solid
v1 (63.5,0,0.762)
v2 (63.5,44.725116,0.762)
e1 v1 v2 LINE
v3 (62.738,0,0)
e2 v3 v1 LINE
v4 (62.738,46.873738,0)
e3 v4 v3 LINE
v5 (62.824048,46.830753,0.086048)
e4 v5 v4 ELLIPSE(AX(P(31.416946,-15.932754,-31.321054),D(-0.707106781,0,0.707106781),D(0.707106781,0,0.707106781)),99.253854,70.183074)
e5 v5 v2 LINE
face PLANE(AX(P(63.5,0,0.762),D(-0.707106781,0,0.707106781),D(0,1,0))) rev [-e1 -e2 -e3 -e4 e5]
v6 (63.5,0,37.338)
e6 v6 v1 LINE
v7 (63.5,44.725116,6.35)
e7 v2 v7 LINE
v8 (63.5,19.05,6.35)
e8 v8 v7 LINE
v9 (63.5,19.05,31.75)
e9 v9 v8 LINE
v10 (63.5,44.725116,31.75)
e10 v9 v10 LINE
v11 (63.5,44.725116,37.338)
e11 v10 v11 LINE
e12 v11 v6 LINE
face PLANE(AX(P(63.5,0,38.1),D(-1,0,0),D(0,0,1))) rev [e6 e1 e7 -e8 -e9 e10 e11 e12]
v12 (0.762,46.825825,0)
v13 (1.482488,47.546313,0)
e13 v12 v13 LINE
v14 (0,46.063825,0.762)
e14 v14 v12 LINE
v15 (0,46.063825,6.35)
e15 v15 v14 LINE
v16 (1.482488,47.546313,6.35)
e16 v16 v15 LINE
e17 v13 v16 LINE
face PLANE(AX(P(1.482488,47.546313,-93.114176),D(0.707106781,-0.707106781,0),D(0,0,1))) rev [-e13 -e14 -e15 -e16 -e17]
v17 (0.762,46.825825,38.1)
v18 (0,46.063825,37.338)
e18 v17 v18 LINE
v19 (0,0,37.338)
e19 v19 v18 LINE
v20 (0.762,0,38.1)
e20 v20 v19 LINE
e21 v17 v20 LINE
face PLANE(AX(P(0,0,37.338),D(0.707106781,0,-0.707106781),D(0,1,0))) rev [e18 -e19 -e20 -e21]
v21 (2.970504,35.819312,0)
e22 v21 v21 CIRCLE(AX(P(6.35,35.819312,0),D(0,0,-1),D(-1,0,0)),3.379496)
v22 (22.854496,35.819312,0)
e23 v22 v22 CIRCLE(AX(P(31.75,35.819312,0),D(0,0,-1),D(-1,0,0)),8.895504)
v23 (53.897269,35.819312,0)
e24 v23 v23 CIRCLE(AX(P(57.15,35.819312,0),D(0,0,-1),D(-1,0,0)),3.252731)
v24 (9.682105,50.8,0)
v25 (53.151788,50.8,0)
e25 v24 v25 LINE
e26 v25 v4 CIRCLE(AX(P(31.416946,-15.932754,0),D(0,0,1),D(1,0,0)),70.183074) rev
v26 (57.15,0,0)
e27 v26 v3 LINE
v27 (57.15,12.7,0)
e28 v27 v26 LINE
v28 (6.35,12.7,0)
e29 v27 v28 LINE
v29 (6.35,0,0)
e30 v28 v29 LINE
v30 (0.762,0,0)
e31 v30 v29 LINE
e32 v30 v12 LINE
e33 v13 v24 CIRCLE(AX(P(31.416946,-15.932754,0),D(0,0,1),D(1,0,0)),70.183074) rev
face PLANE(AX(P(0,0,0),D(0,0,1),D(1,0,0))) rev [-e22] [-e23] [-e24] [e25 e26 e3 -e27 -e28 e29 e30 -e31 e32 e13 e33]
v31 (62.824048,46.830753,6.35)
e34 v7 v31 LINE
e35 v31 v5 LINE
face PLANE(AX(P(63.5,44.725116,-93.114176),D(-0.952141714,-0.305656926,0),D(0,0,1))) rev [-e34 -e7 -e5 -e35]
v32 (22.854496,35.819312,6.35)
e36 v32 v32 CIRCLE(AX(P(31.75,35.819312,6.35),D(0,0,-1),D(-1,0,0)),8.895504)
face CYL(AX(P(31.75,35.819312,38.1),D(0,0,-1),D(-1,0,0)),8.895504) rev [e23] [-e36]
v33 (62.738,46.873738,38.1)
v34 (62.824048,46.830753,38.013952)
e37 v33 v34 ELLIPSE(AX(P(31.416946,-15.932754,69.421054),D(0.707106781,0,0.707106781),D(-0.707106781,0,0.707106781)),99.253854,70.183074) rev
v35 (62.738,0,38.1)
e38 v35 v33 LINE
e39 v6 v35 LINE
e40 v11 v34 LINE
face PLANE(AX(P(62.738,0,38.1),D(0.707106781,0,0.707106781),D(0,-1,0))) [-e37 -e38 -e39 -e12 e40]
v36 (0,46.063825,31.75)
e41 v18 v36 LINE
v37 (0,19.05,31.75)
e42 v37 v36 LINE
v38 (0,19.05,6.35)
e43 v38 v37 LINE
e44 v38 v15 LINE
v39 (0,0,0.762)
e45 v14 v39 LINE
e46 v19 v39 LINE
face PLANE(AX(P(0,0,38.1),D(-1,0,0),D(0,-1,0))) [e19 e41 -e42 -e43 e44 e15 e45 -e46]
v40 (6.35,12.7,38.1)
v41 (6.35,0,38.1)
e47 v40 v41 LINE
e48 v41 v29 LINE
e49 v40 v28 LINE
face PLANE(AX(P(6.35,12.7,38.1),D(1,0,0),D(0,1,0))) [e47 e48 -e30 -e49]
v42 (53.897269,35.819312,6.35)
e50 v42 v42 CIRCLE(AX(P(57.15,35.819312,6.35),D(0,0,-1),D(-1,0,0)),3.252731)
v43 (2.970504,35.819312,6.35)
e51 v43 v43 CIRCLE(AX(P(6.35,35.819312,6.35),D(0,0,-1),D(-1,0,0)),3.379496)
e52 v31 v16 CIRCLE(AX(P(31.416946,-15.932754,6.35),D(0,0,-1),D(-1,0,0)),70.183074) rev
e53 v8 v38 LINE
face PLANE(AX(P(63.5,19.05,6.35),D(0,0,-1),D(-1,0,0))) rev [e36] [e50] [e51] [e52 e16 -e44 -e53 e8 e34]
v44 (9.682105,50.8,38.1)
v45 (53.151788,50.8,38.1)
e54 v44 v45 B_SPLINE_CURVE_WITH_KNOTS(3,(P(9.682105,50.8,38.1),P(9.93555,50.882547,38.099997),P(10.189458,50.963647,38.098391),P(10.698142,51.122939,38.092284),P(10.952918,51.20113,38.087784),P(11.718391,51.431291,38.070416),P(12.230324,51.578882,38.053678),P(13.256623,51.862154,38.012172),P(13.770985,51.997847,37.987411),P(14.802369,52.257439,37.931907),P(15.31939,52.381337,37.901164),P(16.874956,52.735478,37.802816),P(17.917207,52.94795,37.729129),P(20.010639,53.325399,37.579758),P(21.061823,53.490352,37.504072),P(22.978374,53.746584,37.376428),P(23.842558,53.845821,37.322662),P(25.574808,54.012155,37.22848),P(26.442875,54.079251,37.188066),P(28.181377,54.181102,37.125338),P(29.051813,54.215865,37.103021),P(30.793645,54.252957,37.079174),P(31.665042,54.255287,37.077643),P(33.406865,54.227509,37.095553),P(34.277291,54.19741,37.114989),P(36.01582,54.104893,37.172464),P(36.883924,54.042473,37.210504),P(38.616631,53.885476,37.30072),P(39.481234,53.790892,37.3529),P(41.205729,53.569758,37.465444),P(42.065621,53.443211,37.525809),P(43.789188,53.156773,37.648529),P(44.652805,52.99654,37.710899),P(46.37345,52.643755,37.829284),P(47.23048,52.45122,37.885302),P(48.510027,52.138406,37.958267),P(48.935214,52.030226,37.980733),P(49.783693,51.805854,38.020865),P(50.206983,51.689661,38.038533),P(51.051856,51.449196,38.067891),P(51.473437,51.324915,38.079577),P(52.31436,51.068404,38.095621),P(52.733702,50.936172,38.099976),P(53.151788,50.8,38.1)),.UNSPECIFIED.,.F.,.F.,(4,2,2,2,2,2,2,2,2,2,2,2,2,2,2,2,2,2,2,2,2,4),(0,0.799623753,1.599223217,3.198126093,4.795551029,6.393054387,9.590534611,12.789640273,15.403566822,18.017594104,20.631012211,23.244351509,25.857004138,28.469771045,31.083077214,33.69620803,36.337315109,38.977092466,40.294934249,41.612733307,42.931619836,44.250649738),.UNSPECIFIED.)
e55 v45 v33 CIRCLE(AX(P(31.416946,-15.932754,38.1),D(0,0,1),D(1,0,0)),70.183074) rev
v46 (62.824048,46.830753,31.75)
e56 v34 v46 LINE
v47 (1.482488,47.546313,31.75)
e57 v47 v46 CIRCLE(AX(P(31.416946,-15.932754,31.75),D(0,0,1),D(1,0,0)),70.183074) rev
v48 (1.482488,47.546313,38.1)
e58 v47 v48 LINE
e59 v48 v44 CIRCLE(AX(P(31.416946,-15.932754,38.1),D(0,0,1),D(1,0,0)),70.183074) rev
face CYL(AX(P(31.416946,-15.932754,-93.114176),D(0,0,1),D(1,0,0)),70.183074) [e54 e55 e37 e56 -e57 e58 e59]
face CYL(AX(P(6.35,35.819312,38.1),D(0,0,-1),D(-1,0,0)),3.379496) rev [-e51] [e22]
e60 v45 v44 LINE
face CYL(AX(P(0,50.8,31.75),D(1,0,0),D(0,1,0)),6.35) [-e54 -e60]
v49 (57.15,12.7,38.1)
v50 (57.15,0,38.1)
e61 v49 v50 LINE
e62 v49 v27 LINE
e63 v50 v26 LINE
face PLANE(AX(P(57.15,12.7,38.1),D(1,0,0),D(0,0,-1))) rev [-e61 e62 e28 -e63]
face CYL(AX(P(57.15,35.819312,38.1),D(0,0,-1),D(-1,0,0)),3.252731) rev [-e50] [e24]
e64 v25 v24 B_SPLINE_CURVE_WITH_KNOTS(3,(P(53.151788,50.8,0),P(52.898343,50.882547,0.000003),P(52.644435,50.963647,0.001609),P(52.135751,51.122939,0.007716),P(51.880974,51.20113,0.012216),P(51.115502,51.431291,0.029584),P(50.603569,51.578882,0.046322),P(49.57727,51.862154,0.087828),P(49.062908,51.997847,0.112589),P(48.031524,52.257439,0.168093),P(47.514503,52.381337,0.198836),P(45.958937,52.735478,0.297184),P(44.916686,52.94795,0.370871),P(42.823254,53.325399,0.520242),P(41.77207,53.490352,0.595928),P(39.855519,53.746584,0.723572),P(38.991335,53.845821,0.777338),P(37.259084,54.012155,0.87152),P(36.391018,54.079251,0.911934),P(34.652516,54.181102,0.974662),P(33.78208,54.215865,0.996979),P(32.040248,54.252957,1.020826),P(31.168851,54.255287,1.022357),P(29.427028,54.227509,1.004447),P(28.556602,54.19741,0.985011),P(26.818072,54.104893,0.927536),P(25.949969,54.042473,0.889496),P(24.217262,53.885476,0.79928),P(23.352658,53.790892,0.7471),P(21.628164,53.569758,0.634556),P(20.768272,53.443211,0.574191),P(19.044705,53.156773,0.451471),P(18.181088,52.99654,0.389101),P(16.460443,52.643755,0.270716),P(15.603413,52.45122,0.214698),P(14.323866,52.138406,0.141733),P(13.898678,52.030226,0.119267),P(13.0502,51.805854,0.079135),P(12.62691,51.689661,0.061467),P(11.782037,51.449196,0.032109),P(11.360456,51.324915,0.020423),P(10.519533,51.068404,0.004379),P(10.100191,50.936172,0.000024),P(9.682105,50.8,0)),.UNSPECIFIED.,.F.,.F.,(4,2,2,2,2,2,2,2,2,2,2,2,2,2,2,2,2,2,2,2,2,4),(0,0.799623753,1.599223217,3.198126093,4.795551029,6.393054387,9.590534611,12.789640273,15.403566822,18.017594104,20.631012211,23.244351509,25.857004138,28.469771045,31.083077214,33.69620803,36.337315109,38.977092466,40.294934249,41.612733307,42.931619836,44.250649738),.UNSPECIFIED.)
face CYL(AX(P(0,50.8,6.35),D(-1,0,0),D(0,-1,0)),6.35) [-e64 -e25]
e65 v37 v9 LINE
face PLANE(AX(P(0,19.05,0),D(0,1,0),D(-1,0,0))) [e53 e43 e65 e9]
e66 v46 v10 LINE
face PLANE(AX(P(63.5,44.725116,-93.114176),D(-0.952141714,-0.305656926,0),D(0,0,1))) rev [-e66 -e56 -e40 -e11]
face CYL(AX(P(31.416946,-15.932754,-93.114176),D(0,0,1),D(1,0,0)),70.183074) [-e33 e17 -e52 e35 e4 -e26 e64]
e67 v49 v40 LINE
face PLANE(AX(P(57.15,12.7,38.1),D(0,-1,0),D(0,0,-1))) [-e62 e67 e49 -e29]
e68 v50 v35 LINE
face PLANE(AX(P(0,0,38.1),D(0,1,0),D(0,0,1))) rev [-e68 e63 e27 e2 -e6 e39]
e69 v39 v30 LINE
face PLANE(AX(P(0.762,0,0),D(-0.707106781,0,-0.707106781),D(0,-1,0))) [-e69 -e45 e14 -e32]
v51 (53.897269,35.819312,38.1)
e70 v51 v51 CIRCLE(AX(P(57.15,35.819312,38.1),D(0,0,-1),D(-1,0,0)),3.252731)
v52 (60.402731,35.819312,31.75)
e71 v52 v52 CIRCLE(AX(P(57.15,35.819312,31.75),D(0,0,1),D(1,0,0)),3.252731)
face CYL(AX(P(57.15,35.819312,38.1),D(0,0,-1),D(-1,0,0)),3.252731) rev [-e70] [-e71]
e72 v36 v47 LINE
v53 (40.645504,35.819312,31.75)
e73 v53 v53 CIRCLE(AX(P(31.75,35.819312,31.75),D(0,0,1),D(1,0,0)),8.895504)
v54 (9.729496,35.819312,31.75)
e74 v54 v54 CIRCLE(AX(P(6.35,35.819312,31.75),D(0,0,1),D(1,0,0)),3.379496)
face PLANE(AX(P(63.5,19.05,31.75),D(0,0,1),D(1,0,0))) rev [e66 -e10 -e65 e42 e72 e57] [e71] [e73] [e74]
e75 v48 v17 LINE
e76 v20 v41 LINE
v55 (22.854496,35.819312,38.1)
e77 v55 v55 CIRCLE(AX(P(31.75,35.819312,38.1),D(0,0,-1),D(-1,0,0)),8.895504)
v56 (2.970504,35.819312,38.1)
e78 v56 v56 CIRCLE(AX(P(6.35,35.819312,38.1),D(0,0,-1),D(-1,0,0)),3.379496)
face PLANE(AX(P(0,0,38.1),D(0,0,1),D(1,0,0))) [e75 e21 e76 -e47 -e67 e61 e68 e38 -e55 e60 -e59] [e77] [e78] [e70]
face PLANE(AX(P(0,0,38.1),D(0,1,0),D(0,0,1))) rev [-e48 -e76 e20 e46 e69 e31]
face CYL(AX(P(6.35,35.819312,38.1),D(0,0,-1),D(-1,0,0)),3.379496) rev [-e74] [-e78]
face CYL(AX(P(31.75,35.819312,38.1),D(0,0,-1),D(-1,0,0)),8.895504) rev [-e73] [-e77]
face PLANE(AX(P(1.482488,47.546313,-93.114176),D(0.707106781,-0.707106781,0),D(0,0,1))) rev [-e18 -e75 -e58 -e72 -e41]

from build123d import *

# Parameters (mm, degrees)
SKETCH1_W               = 63.5
SKETCH1_H               = 57.15
BOSS_EXTRUDE1_DEPTH     = 38.1
SKETCH2_W               = 50.8
SKETCH2_H               = 12.7
CUT_EXTRUDE1_DEPTH      = 94.541341128
SKETCH3_W               = 63.5
SKETCH3_H               = 25.4
CUT_EXTRUDE2_DEPTH      = 38.1
FILLET3_R               = 6.35
FILLET4_R               = 6.35
SKETCH4_R               = 3.252730628
SKETCH4_R_2             = 3.379495502
SKETCH4_R_3             = 8.895504244
CUT_EXTRUDE3_DEPTH      = 94.541341128
CHAMFER1_SIZE           = 0.762
CHAMFER2_SIZE           = 0.762
CUT_EXTRUDE5_DEPTH      = 92.139645599
CUT_EXTRUDE5_DEPTH_BACK = 92.139645599
CHAMFER3_SIZE           = 0.762
CHAMFER3_SIZE_2         = 1.762810924


# Some blends are built 0.0001 mm under size
with BuildPart() as part:
    # Sketch1 → Boss-Extrude1 (new body)
    with BuildSketch(Plane.XY):
        with Locations((31.75, 28.575)):
            Rectangle(SKETCH1_W, SKETCH1_H)
    extrude(amount=BOSS_EXTRUDE1_DEPTH)

    # Sketch2 → Cut-Extrude1 (cut, through all)
    with BuildSketch(Plane(origin=(0, 0, 0), x_dir=(-1, 0, 0), z_dir=(0, 0, -1))):
        with Locations((-31.75, 6.35)):
            Rectangle(SKETCH2_W, SKETCH2_H)
    extrude(amount=-CUT_EXTRUDE1_DEPTH, mode=Mode.SUBTRACT)

    # Sketch3 → Cut-Extrude2 (cut)
    with BuildSketch(Plane(origin=(0, 57.15, 0), x_dir=(1, 0, 0), z_dir=(0, 1, 0))):
        with Locations((31.75, -19.05)):
            Rectangle(SKETCH3_W, SKETCH3_H)
    extrude(amount=-CUT_EXTRUDE2_DEPTH, mode=Mode.SUBTRACT)

    # Fillet3
    fillet3_edges = [part.edges().sort_by_distance(p)[0] for p in [
        (31.75, 57.15, 38.1),
    ]]
    fillet(fillet3_edges, radius=FILLET3_R - 0.0001)  # a hair under: the kernel refuses the full size

    # Fillet4
    fillet4_edges = [part.edges().sort_by_distance(p)[0] for p in [
        (31.75, 57.15, 0),
    ]]
    fillet(fillet4_edges, radius=FILLET4_R - 0.0001)  # a hair under: the kernel refuses the full size

    # Sketch4 → Cut-Extrude3 (cut, through all)
    with BuildSketch(Plane(origin=(0, 0, 0), x_dir=(-1, 0, 0), z_dir=(0, 0, -1))):
        with Locations((-57.15, 35.819311932)):
            Circle(SKETCH4_R)
        with Locations((-6.35, 35.819311932)):
            Circle(SKETCH4_R_2)
        with Locations((-31.75, 35.819311932)):
            Circle(SKETCH4_R_3)
    extrude(amount=-CUT_EXTRUDE3_DEPTH, mode=Mode.SUBTRACT)

    # Chamfer1
    chamfer1_edges = [part.edges().sort_by_distance(p)[0] for p in [
        (63.5, 55.29015735, 1.85984265),
        (63.5, 25.40005, 0),
    ]]
    chamfer(chamfer1_edges, length=CHAMFER1_SIZE)

    # Chamfer2
    chamfer2_edges = [part.edges().sort_by_distance(p)[0] for p in [
        (0, 25.40005, 38.1),
        (63.5, 55.29015735, 36.24015735),
        (0, 55.29015735, 36.24015735),
        (0, 25.40005, 0),
        (0, 55.29015735, 1.85984265),
        (63.5, 25.40005, 38.1),
    ]]
    chamfer(chamfer2_edges, length=CHAMFER2_SIZE)

    # Sketch5 → Cut-Extrude5 (cut, two sides: drawn at the far end of the back side and taken through both)
    with BuildSketch(Plane(origin=(0, 0, 31.75), x_dir=(-1, 0, 0), z_dir=(0, 0, -1)).offset(-CUT_EXTRUDE5_DEPTH_BACK)):
        with BuildLine():
            Line((152.450199575, -35.171760157), (1.839159199, 45.87092885))
            ThreePointArc((1.839159199, 45.87092885), (-32.809317684, 54.236506182), (-67.098653648, 44.502993274))
            Line((-67.098653648, 44.502993274), (-214.376135409, -42.450708722))
            Line((-214.376135409, -42.450708722), (-221.162348462, 299.543968154))
            Line((-221.162348462, 299.543968154), (145.663986523, 306.822916719))
            Line((145.663986523, 306.822916719), (152.450199575, -35.171760157))
        make_face()
    extrude(amount=CUT_EXTRUDE5_DEPTH + CUT_EXTRUDE5_DEPTH_BACK, mode=Mode.SUBTRACT)

    # Chamfer3
    # the kernel refuses this chamfer: 1.762810924, 1.706340641, 0.762 mm, written as the material it takes off along each edge
    with BuildSketch(Plane(origin=(0, 46.825825111, -3.52035895), x_dir=(0.8994074011398961, 0.43711134368119303, 0), z_dir=(0, 0, 1))) as chamfer3_piece_1:
        with BuildLine():
            Line((1.648294394, 0), (-CHAMFER3_SIZE * 0.437111343681, -CHAMFER3_SIZE * 0.89940740114))
            Line((-CHAMFER3_SIZE * 0.437111343681, -CHAMFER3_SIZE * 0.89940740114), (0, 0))
            ThreePointArc((0, 0), (0.856396227, 0.004831664), (1.648294394, 0))
        make_face()
    extrude(amount=14.152717899, mode=Mode.SUBTRACT)
    with BuildSketch(Plane(origin=(0, 46.825825111, 27.46764105), x_dir=(0, -1, 0), z_dir=(0, 0, 1))) as chamfer3_piece_2:
        with BuildLine():
            Line((CHAMFER3_SIZE, 0), (-0.720488177, 1.482488177))
            ThreePointArc((-0.720488177, 1.482488177), (-0.37868614, 0.76813713), (0, 0))
            Line((0, 0), (CHAMFER3_SIZE, 0))
        make_face()
    extrude(amount=14.152717899, mode=Mode.SUBTRACT)
    with BuildSketch(Plane(origin=(63.5, 46.487927277, -3.813189181), x_dir=(-0.8918533135709217, 0.4523247363040928, 0), z_dir=(0, 0, 1))) as chamfer3_piece_3:
        with BuildLine():
            Line((0.757918605, 0), (-CHAMFER3_SIZE_2 * 0.452324736297, CHAMFER3_SIZE_2 * 0.891853313556))
            Line((-CHAMFER3_SIZE_2 * 0.452324736297, CHAMFER3_SIZE_2 * 0.891853313556), (0, 0))
            ThreePointArc((0, 0), (0.403745747, -0.001018742), (0.757918605, 0))
        make_face()
    extrude(amount=14.738378362, mode=Mode.SUBTRACT)
    with BuildSketch(Plane(origin=(63.5, 46.487927277, 27.174810819), x_dir=(0, -1, 0), z_dir=(0, 0, 1))) as chamfer3_piece_4:
        with BuildLine():
            Line((CHAMFER3_SIZE_2, 0), (-0.342825333, -0.675952219))
            ThreePointArc((-0.342825333, -0.675952219), (-0.183532757, -0.35962118), (0, 0))
            Line((0, 0), (CHAMFER3_SIZE_2, 0))
        make_face()
    extrude(amount=14.738378362, mode=Mode.SUBTRACT)


solid = part.part
